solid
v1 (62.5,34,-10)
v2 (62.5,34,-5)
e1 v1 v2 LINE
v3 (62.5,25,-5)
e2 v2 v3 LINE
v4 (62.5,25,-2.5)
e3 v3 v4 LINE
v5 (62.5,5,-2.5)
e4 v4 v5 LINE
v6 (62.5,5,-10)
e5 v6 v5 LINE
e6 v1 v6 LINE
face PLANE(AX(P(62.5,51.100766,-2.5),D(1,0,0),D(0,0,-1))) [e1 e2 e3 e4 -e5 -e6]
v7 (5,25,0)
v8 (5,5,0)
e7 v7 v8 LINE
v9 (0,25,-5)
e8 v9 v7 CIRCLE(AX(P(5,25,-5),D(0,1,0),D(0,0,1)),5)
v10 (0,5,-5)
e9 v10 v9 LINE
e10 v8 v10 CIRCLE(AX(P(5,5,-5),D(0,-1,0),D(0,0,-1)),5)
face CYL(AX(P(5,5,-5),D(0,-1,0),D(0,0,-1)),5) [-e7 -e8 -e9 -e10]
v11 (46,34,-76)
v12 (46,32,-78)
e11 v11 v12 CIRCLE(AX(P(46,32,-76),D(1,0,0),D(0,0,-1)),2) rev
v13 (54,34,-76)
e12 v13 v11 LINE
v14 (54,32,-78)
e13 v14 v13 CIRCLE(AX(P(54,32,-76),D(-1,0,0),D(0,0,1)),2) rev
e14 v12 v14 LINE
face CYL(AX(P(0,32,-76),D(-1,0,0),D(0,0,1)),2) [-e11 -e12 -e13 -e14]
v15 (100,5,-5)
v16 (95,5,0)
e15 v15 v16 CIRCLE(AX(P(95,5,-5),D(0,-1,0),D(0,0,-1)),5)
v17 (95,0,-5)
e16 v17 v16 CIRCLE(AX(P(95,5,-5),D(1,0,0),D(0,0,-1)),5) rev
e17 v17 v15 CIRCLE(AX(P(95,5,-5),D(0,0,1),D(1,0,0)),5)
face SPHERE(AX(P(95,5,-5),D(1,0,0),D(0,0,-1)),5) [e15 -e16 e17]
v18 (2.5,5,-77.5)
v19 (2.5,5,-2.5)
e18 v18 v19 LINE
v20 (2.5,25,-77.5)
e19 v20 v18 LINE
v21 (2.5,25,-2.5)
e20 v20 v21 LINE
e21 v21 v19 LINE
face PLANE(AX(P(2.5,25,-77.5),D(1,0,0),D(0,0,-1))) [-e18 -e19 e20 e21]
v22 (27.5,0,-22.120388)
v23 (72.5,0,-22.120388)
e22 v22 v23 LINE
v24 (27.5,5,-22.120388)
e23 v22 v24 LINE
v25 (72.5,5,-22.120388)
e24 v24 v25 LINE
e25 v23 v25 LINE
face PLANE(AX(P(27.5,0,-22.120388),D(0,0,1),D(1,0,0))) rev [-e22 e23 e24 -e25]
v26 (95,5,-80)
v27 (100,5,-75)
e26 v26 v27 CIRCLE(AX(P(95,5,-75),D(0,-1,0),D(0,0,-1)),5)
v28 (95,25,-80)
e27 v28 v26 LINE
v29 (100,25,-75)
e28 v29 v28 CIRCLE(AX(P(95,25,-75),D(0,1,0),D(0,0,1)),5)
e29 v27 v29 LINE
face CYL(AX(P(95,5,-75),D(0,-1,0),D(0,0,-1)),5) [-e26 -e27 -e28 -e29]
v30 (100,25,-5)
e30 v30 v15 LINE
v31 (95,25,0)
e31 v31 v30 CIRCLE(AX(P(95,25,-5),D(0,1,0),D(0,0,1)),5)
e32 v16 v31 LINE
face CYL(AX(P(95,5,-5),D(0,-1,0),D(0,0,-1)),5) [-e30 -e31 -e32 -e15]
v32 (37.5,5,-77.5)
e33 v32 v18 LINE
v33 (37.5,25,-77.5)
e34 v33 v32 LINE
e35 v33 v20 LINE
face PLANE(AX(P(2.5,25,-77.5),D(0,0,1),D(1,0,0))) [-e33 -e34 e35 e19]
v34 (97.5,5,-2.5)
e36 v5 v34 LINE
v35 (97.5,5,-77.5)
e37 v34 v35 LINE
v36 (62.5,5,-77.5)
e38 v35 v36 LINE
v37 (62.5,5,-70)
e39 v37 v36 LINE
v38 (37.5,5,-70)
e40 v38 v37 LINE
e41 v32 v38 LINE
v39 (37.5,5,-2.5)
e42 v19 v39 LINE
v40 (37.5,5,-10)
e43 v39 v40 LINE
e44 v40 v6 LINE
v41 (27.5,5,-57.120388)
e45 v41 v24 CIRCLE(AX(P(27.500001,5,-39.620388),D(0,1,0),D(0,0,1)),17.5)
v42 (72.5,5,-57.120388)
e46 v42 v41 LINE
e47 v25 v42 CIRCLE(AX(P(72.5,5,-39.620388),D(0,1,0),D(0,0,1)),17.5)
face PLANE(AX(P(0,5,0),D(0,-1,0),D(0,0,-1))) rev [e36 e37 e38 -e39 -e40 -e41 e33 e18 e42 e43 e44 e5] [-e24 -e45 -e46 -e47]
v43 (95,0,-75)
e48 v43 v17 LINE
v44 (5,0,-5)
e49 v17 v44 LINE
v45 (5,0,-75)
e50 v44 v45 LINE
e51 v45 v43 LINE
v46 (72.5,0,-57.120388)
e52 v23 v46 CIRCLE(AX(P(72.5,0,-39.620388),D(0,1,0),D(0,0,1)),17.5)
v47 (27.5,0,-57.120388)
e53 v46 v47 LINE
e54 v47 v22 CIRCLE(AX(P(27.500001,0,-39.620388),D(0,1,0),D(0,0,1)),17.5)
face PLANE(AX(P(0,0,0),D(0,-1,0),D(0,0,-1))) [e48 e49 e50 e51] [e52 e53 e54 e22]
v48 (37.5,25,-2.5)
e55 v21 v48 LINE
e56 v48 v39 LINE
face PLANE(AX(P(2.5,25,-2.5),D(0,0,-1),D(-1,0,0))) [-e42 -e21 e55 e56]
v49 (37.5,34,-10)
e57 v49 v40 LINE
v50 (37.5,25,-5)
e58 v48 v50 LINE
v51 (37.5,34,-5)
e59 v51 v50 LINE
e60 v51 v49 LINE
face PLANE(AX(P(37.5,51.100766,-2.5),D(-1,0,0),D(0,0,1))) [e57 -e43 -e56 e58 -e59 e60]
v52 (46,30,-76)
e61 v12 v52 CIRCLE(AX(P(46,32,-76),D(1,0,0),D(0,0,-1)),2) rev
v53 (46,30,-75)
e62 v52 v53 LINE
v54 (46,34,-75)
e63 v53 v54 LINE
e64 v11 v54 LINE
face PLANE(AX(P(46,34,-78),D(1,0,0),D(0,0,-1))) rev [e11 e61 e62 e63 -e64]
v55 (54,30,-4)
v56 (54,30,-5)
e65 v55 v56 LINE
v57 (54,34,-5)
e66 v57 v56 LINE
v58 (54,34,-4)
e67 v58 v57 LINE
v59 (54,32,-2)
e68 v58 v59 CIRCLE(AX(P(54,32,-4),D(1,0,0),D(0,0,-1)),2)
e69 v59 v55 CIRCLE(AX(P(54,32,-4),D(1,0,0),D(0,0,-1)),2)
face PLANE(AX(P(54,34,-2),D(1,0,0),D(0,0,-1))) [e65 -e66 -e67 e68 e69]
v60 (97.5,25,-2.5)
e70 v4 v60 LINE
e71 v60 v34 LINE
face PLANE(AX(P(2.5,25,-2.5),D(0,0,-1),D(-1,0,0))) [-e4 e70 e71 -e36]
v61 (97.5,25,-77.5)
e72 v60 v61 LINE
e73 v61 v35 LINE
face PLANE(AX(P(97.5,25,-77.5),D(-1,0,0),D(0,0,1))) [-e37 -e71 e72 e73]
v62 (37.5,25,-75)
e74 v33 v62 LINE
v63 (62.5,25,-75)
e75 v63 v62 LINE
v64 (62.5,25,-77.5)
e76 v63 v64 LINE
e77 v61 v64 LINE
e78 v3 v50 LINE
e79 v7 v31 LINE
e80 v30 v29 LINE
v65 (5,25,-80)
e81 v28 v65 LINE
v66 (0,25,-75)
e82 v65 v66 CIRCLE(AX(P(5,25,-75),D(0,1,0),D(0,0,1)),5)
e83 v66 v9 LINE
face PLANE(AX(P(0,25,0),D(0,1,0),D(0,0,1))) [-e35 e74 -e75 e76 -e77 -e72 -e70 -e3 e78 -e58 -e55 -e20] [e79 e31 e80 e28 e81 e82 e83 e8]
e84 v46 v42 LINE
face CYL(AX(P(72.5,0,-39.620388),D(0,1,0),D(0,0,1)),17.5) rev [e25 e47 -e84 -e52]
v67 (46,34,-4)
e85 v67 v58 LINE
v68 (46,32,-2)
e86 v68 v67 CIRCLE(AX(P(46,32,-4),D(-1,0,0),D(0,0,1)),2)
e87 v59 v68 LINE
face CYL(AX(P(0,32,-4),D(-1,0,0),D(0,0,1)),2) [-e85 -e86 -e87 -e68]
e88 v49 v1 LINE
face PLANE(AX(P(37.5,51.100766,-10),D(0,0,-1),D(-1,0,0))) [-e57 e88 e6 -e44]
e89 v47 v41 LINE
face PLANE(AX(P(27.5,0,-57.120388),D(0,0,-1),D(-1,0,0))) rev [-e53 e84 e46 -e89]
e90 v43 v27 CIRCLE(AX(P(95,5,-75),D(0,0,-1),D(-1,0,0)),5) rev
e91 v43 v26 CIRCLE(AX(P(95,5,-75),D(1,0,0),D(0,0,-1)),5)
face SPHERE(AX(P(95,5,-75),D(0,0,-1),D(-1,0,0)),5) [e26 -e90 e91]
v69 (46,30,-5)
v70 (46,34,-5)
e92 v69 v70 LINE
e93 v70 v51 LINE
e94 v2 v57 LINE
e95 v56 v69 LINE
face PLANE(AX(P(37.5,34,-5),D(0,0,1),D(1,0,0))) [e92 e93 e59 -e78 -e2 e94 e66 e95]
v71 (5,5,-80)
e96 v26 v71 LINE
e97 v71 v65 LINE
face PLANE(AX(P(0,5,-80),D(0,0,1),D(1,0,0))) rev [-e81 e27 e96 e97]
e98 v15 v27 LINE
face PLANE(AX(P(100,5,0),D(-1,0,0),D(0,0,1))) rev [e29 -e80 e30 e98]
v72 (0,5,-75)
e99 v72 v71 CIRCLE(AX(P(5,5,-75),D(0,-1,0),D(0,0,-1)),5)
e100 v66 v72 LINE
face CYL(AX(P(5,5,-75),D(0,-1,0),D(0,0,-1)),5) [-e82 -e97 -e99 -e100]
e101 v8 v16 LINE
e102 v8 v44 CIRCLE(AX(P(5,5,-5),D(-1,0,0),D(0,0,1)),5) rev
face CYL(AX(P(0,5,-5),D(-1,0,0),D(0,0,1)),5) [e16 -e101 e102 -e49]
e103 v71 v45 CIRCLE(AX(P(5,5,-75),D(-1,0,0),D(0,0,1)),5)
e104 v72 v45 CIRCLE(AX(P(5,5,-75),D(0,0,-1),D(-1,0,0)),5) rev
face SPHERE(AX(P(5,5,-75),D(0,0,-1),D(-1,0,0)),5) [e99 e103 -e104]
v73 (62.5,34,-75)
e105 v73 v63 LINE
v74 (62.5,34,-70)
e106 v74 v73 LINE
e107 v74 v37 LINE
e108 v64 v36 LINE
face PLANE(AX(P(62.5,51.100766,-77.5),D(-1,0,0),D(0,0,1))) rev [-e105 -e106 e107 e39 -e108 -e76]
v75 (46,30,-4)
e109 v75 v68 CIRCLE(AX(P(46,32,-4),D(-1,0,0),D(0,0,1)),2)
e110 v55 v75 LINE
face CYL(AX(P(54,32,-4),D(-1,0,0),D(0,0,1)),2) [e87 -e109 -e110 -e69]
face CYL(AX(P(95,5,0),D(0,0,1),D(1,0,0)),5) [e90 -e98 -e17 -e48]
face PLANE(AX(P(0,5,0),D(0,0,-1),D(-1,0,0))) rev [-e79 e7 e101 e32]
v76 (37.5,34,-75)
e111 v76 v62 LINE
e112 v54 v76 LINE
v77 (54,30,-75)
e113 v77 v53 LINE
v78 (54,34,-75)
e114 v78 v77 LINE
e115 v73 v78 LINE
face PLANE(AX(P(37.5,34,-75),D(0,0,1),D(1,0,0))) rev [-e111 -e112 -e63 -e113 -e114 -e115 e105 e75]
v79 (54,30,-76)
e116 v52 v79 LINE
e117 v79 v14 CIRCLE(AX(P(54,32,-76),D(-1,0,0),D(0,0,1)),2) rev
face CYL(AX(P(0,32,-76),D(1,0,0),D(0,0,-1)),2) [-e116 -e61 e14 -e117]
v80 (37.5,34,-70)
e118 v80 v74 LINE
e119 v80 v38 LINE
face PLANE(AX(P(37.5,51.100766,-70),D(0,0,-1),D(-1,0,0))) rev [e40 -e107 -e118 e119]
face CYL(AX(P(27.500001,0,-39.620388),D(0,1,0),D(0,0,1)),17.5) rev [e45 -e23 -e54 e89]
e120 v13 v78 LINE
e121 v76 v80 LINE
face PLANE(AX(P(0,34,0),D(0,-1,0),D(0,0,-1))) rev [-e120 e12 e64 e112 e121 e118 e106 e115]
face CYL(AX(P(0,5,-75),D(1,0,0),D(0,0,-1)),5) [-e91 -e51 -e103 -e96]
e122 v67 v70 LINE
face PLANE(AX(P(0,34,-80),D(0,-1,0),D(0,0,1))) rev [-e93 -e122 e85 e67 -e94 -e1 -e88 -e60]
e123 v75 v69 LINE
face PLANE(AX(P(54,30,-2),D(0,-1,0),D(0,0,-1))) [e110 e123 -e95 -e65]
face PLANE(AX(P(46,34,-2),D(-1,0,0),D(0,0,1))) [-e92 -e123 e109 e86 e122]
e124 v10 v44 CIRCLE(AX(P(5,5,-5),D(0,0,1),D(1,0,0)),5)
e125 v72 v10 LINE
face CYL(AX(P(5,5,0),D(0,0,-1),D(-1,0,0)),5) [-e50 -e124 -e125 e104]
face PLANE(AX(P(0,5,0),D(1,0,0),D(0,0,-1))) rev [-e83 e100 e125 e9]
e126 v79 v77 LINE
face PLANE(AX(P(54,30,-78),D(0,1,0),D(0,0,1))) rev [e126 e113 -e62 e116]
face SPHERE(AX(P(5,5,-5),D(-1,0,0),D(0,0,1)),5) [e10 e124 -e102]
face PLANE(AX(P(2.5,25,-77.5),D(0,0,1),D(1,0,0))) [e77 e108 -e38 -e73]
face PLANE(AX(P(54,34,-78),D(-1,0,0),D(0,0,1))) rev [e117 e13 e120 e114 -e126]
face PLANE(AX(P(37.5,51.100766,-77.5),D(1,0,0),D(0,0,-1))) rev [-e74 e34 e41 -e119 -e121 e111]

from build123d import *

# Parameters (mm, degrees)
SKETCH1_W            = 100
SKETCH1_H            = 80
BOSS_EXTRUDE1_DEPTH  = 5
SKETCH2_W            = 100
SKETCH2_H            = 80
SKETCH2_W_2          = 95
SKETCH2_H_2          = 75
BOSS_EXTRUDE2_DEPTH  = 20
SKETCH3_W            = 25
SKETCH3_H            = 7.5
BOSS_EXTRUDE3_DEPTH  = 20
SKETCH4_W            = 25
SKETCH4_H            = 5
BOSS_EXTRUDE4_DEPTH  = 9
SKETCH5_W            = 8
SKETCH5_H            = 4
BOSS_EXTRUDE5_DEPTH  = 3
FILLET1_R            = 2
FILLET2_R            = 5
FILLET1_OF_MIRROR2_R = 2
CUT_EXTRUDE1_DEPTH   = 132.304988481


with BuildPart() as part:
    # Sketch1 → Boss-Extrude1 (new body)
    with BuildSketch(Plane(origin=(0, 0, 0), x_dir=(1, 0, 0), z_dir=(0, 1, 0))):
        with Locations((50, 40)):
            Rectangle(SKETCH1_W, SKETCH1_H)
    extrude(amount=BOSS_EXTRUDE1_DEPTH)

    # Sketch2 → Boss-Extrude2 (add)
    with BuildSketch(Plane(origin=(0, 5, 0), x_dir=(1, 0, 0), z_dir=(0, 1, 0))):
        with Locations((50, 40)):
            Rectangle(SKETCH2_W, SKETCH2_H)
        with Locations((50, 40)):
            Rectangle(SKETCH2_W_2, SKETCH2_H_2, mode=Mode.SUBTRACT)
    extrude(amount=BOSS_EXTRUDE2_DEPTH)

    # Sketch3 → Boss-Extrude3 (add)
    with BuildSketch(Plane(origin=(0, 5, 0), x_dir=(1, 0, 0), z_dir=(0, 1, 0))):
        with Locations((50, 73.75)):
            Rectangle(SKETCH3_W, SKETCH3_H)
    boss_extrude3 = extrude(amount=BOSS_EXTRUDE3_DEPTH)

    # Sketch4 → Boss-Extrude4 (add)
    with BuildSketch(Plane(origin=(0, 25, 0), x_dir=(1, 0, 0), z_dir=(0, 1, 0))):
        with Locations((50, 72.5)):
            Rectangle(SKETCH4_W, SKETCH4_H)
    boss_extrude4 = extrude(amount=BOSS_EXTRUDE4_DEPTH)

    # Sketch5 → Boss-Extrude5 (add)
    with BuildSketch(Plane(origin=(0, 0, -75), x_dir=(-1, 0, 0), z_dir=(0, 0, -1))):
        with Locations((-50, 32)):
            Rectangle(SKETCH5_W, SKETCH5_H)
    boss_extrude5 = extrude(amount=BOSS_EXTRUDE5_DEPTH)

    # Fillet1
    fillet1_edges = [part.edges().sort_by_distance(p)[0] for p in [
        (50, 30, -78),
        (50, 34, -78),
    ]]
    fillet(fillet1_edges, radius=FILLET1_R - 0.0001)  # a hair under: the kernel refuses the full size

    # Fillet2
    fillet2_edges = [part.edges().sort_by_distance(p)[0] for p in [
        (50, 0, -80),
        (100, 0, -40),
        (50, 0, 0),
        (0, 0, -40),
        (0, 12.5, -80),
        (100, 12.5, -80),
        (100, 12.5, 0),
        (0, 12.5, 0),
    ]]
    fillet(fillet2_edges, radius=FILLET2_R)

    # Mirror2: Boss-Extrude3, Boss-Extrude4, Boss-Extrude5 across plane
    add(boss_extrude3.mirror(Plane.XY.offset(-40)))
    add(boss_extrude4.mirror(Plane.XY.offset(-40)))
    add(boss_extrude5.mirror(Plane.XY.offset(-40)))

    # Fillet1 of Mirror2
    fillet1_of_mirror2_edges = [part.edges().sort_by_distance(p)[0] for p in [
        (50, 30, -2),
        (50, 34, -2),
    ]]
    fillet(fillet1_of_mirror2_edges, radius=FILLET1_OF_MIRROR2_R - 0.0001)  # a hair under: the kernel refuses the full size

    # Sketch6 → Cut-Extrude1 (cut, through all)
    with BuildSketch(Plane(origin=(0, 5, 0), x_dir=(1, 0, 0), z_dir=(0, 1, 0))):
        with BuildLine():
            Line((27.5, 57.120387913), (72.5, 57.120387913))
            ThreePointArc((72.5, 57.120387913), (90, 39.620387913), (72.5, 22.120387913))
            Line((72.5, 22.120387913), (27.5, 22.120387913))
            ThreePointArc((27.5, 22.120387913), (10.000000977, 39.620387913), (27.5, 57.120387913))
        make_face()
    extrude(amount=-CUT_EXTRUDE1_DEPTH, mode=Mode.SUBTRACT)


solid = part.part
